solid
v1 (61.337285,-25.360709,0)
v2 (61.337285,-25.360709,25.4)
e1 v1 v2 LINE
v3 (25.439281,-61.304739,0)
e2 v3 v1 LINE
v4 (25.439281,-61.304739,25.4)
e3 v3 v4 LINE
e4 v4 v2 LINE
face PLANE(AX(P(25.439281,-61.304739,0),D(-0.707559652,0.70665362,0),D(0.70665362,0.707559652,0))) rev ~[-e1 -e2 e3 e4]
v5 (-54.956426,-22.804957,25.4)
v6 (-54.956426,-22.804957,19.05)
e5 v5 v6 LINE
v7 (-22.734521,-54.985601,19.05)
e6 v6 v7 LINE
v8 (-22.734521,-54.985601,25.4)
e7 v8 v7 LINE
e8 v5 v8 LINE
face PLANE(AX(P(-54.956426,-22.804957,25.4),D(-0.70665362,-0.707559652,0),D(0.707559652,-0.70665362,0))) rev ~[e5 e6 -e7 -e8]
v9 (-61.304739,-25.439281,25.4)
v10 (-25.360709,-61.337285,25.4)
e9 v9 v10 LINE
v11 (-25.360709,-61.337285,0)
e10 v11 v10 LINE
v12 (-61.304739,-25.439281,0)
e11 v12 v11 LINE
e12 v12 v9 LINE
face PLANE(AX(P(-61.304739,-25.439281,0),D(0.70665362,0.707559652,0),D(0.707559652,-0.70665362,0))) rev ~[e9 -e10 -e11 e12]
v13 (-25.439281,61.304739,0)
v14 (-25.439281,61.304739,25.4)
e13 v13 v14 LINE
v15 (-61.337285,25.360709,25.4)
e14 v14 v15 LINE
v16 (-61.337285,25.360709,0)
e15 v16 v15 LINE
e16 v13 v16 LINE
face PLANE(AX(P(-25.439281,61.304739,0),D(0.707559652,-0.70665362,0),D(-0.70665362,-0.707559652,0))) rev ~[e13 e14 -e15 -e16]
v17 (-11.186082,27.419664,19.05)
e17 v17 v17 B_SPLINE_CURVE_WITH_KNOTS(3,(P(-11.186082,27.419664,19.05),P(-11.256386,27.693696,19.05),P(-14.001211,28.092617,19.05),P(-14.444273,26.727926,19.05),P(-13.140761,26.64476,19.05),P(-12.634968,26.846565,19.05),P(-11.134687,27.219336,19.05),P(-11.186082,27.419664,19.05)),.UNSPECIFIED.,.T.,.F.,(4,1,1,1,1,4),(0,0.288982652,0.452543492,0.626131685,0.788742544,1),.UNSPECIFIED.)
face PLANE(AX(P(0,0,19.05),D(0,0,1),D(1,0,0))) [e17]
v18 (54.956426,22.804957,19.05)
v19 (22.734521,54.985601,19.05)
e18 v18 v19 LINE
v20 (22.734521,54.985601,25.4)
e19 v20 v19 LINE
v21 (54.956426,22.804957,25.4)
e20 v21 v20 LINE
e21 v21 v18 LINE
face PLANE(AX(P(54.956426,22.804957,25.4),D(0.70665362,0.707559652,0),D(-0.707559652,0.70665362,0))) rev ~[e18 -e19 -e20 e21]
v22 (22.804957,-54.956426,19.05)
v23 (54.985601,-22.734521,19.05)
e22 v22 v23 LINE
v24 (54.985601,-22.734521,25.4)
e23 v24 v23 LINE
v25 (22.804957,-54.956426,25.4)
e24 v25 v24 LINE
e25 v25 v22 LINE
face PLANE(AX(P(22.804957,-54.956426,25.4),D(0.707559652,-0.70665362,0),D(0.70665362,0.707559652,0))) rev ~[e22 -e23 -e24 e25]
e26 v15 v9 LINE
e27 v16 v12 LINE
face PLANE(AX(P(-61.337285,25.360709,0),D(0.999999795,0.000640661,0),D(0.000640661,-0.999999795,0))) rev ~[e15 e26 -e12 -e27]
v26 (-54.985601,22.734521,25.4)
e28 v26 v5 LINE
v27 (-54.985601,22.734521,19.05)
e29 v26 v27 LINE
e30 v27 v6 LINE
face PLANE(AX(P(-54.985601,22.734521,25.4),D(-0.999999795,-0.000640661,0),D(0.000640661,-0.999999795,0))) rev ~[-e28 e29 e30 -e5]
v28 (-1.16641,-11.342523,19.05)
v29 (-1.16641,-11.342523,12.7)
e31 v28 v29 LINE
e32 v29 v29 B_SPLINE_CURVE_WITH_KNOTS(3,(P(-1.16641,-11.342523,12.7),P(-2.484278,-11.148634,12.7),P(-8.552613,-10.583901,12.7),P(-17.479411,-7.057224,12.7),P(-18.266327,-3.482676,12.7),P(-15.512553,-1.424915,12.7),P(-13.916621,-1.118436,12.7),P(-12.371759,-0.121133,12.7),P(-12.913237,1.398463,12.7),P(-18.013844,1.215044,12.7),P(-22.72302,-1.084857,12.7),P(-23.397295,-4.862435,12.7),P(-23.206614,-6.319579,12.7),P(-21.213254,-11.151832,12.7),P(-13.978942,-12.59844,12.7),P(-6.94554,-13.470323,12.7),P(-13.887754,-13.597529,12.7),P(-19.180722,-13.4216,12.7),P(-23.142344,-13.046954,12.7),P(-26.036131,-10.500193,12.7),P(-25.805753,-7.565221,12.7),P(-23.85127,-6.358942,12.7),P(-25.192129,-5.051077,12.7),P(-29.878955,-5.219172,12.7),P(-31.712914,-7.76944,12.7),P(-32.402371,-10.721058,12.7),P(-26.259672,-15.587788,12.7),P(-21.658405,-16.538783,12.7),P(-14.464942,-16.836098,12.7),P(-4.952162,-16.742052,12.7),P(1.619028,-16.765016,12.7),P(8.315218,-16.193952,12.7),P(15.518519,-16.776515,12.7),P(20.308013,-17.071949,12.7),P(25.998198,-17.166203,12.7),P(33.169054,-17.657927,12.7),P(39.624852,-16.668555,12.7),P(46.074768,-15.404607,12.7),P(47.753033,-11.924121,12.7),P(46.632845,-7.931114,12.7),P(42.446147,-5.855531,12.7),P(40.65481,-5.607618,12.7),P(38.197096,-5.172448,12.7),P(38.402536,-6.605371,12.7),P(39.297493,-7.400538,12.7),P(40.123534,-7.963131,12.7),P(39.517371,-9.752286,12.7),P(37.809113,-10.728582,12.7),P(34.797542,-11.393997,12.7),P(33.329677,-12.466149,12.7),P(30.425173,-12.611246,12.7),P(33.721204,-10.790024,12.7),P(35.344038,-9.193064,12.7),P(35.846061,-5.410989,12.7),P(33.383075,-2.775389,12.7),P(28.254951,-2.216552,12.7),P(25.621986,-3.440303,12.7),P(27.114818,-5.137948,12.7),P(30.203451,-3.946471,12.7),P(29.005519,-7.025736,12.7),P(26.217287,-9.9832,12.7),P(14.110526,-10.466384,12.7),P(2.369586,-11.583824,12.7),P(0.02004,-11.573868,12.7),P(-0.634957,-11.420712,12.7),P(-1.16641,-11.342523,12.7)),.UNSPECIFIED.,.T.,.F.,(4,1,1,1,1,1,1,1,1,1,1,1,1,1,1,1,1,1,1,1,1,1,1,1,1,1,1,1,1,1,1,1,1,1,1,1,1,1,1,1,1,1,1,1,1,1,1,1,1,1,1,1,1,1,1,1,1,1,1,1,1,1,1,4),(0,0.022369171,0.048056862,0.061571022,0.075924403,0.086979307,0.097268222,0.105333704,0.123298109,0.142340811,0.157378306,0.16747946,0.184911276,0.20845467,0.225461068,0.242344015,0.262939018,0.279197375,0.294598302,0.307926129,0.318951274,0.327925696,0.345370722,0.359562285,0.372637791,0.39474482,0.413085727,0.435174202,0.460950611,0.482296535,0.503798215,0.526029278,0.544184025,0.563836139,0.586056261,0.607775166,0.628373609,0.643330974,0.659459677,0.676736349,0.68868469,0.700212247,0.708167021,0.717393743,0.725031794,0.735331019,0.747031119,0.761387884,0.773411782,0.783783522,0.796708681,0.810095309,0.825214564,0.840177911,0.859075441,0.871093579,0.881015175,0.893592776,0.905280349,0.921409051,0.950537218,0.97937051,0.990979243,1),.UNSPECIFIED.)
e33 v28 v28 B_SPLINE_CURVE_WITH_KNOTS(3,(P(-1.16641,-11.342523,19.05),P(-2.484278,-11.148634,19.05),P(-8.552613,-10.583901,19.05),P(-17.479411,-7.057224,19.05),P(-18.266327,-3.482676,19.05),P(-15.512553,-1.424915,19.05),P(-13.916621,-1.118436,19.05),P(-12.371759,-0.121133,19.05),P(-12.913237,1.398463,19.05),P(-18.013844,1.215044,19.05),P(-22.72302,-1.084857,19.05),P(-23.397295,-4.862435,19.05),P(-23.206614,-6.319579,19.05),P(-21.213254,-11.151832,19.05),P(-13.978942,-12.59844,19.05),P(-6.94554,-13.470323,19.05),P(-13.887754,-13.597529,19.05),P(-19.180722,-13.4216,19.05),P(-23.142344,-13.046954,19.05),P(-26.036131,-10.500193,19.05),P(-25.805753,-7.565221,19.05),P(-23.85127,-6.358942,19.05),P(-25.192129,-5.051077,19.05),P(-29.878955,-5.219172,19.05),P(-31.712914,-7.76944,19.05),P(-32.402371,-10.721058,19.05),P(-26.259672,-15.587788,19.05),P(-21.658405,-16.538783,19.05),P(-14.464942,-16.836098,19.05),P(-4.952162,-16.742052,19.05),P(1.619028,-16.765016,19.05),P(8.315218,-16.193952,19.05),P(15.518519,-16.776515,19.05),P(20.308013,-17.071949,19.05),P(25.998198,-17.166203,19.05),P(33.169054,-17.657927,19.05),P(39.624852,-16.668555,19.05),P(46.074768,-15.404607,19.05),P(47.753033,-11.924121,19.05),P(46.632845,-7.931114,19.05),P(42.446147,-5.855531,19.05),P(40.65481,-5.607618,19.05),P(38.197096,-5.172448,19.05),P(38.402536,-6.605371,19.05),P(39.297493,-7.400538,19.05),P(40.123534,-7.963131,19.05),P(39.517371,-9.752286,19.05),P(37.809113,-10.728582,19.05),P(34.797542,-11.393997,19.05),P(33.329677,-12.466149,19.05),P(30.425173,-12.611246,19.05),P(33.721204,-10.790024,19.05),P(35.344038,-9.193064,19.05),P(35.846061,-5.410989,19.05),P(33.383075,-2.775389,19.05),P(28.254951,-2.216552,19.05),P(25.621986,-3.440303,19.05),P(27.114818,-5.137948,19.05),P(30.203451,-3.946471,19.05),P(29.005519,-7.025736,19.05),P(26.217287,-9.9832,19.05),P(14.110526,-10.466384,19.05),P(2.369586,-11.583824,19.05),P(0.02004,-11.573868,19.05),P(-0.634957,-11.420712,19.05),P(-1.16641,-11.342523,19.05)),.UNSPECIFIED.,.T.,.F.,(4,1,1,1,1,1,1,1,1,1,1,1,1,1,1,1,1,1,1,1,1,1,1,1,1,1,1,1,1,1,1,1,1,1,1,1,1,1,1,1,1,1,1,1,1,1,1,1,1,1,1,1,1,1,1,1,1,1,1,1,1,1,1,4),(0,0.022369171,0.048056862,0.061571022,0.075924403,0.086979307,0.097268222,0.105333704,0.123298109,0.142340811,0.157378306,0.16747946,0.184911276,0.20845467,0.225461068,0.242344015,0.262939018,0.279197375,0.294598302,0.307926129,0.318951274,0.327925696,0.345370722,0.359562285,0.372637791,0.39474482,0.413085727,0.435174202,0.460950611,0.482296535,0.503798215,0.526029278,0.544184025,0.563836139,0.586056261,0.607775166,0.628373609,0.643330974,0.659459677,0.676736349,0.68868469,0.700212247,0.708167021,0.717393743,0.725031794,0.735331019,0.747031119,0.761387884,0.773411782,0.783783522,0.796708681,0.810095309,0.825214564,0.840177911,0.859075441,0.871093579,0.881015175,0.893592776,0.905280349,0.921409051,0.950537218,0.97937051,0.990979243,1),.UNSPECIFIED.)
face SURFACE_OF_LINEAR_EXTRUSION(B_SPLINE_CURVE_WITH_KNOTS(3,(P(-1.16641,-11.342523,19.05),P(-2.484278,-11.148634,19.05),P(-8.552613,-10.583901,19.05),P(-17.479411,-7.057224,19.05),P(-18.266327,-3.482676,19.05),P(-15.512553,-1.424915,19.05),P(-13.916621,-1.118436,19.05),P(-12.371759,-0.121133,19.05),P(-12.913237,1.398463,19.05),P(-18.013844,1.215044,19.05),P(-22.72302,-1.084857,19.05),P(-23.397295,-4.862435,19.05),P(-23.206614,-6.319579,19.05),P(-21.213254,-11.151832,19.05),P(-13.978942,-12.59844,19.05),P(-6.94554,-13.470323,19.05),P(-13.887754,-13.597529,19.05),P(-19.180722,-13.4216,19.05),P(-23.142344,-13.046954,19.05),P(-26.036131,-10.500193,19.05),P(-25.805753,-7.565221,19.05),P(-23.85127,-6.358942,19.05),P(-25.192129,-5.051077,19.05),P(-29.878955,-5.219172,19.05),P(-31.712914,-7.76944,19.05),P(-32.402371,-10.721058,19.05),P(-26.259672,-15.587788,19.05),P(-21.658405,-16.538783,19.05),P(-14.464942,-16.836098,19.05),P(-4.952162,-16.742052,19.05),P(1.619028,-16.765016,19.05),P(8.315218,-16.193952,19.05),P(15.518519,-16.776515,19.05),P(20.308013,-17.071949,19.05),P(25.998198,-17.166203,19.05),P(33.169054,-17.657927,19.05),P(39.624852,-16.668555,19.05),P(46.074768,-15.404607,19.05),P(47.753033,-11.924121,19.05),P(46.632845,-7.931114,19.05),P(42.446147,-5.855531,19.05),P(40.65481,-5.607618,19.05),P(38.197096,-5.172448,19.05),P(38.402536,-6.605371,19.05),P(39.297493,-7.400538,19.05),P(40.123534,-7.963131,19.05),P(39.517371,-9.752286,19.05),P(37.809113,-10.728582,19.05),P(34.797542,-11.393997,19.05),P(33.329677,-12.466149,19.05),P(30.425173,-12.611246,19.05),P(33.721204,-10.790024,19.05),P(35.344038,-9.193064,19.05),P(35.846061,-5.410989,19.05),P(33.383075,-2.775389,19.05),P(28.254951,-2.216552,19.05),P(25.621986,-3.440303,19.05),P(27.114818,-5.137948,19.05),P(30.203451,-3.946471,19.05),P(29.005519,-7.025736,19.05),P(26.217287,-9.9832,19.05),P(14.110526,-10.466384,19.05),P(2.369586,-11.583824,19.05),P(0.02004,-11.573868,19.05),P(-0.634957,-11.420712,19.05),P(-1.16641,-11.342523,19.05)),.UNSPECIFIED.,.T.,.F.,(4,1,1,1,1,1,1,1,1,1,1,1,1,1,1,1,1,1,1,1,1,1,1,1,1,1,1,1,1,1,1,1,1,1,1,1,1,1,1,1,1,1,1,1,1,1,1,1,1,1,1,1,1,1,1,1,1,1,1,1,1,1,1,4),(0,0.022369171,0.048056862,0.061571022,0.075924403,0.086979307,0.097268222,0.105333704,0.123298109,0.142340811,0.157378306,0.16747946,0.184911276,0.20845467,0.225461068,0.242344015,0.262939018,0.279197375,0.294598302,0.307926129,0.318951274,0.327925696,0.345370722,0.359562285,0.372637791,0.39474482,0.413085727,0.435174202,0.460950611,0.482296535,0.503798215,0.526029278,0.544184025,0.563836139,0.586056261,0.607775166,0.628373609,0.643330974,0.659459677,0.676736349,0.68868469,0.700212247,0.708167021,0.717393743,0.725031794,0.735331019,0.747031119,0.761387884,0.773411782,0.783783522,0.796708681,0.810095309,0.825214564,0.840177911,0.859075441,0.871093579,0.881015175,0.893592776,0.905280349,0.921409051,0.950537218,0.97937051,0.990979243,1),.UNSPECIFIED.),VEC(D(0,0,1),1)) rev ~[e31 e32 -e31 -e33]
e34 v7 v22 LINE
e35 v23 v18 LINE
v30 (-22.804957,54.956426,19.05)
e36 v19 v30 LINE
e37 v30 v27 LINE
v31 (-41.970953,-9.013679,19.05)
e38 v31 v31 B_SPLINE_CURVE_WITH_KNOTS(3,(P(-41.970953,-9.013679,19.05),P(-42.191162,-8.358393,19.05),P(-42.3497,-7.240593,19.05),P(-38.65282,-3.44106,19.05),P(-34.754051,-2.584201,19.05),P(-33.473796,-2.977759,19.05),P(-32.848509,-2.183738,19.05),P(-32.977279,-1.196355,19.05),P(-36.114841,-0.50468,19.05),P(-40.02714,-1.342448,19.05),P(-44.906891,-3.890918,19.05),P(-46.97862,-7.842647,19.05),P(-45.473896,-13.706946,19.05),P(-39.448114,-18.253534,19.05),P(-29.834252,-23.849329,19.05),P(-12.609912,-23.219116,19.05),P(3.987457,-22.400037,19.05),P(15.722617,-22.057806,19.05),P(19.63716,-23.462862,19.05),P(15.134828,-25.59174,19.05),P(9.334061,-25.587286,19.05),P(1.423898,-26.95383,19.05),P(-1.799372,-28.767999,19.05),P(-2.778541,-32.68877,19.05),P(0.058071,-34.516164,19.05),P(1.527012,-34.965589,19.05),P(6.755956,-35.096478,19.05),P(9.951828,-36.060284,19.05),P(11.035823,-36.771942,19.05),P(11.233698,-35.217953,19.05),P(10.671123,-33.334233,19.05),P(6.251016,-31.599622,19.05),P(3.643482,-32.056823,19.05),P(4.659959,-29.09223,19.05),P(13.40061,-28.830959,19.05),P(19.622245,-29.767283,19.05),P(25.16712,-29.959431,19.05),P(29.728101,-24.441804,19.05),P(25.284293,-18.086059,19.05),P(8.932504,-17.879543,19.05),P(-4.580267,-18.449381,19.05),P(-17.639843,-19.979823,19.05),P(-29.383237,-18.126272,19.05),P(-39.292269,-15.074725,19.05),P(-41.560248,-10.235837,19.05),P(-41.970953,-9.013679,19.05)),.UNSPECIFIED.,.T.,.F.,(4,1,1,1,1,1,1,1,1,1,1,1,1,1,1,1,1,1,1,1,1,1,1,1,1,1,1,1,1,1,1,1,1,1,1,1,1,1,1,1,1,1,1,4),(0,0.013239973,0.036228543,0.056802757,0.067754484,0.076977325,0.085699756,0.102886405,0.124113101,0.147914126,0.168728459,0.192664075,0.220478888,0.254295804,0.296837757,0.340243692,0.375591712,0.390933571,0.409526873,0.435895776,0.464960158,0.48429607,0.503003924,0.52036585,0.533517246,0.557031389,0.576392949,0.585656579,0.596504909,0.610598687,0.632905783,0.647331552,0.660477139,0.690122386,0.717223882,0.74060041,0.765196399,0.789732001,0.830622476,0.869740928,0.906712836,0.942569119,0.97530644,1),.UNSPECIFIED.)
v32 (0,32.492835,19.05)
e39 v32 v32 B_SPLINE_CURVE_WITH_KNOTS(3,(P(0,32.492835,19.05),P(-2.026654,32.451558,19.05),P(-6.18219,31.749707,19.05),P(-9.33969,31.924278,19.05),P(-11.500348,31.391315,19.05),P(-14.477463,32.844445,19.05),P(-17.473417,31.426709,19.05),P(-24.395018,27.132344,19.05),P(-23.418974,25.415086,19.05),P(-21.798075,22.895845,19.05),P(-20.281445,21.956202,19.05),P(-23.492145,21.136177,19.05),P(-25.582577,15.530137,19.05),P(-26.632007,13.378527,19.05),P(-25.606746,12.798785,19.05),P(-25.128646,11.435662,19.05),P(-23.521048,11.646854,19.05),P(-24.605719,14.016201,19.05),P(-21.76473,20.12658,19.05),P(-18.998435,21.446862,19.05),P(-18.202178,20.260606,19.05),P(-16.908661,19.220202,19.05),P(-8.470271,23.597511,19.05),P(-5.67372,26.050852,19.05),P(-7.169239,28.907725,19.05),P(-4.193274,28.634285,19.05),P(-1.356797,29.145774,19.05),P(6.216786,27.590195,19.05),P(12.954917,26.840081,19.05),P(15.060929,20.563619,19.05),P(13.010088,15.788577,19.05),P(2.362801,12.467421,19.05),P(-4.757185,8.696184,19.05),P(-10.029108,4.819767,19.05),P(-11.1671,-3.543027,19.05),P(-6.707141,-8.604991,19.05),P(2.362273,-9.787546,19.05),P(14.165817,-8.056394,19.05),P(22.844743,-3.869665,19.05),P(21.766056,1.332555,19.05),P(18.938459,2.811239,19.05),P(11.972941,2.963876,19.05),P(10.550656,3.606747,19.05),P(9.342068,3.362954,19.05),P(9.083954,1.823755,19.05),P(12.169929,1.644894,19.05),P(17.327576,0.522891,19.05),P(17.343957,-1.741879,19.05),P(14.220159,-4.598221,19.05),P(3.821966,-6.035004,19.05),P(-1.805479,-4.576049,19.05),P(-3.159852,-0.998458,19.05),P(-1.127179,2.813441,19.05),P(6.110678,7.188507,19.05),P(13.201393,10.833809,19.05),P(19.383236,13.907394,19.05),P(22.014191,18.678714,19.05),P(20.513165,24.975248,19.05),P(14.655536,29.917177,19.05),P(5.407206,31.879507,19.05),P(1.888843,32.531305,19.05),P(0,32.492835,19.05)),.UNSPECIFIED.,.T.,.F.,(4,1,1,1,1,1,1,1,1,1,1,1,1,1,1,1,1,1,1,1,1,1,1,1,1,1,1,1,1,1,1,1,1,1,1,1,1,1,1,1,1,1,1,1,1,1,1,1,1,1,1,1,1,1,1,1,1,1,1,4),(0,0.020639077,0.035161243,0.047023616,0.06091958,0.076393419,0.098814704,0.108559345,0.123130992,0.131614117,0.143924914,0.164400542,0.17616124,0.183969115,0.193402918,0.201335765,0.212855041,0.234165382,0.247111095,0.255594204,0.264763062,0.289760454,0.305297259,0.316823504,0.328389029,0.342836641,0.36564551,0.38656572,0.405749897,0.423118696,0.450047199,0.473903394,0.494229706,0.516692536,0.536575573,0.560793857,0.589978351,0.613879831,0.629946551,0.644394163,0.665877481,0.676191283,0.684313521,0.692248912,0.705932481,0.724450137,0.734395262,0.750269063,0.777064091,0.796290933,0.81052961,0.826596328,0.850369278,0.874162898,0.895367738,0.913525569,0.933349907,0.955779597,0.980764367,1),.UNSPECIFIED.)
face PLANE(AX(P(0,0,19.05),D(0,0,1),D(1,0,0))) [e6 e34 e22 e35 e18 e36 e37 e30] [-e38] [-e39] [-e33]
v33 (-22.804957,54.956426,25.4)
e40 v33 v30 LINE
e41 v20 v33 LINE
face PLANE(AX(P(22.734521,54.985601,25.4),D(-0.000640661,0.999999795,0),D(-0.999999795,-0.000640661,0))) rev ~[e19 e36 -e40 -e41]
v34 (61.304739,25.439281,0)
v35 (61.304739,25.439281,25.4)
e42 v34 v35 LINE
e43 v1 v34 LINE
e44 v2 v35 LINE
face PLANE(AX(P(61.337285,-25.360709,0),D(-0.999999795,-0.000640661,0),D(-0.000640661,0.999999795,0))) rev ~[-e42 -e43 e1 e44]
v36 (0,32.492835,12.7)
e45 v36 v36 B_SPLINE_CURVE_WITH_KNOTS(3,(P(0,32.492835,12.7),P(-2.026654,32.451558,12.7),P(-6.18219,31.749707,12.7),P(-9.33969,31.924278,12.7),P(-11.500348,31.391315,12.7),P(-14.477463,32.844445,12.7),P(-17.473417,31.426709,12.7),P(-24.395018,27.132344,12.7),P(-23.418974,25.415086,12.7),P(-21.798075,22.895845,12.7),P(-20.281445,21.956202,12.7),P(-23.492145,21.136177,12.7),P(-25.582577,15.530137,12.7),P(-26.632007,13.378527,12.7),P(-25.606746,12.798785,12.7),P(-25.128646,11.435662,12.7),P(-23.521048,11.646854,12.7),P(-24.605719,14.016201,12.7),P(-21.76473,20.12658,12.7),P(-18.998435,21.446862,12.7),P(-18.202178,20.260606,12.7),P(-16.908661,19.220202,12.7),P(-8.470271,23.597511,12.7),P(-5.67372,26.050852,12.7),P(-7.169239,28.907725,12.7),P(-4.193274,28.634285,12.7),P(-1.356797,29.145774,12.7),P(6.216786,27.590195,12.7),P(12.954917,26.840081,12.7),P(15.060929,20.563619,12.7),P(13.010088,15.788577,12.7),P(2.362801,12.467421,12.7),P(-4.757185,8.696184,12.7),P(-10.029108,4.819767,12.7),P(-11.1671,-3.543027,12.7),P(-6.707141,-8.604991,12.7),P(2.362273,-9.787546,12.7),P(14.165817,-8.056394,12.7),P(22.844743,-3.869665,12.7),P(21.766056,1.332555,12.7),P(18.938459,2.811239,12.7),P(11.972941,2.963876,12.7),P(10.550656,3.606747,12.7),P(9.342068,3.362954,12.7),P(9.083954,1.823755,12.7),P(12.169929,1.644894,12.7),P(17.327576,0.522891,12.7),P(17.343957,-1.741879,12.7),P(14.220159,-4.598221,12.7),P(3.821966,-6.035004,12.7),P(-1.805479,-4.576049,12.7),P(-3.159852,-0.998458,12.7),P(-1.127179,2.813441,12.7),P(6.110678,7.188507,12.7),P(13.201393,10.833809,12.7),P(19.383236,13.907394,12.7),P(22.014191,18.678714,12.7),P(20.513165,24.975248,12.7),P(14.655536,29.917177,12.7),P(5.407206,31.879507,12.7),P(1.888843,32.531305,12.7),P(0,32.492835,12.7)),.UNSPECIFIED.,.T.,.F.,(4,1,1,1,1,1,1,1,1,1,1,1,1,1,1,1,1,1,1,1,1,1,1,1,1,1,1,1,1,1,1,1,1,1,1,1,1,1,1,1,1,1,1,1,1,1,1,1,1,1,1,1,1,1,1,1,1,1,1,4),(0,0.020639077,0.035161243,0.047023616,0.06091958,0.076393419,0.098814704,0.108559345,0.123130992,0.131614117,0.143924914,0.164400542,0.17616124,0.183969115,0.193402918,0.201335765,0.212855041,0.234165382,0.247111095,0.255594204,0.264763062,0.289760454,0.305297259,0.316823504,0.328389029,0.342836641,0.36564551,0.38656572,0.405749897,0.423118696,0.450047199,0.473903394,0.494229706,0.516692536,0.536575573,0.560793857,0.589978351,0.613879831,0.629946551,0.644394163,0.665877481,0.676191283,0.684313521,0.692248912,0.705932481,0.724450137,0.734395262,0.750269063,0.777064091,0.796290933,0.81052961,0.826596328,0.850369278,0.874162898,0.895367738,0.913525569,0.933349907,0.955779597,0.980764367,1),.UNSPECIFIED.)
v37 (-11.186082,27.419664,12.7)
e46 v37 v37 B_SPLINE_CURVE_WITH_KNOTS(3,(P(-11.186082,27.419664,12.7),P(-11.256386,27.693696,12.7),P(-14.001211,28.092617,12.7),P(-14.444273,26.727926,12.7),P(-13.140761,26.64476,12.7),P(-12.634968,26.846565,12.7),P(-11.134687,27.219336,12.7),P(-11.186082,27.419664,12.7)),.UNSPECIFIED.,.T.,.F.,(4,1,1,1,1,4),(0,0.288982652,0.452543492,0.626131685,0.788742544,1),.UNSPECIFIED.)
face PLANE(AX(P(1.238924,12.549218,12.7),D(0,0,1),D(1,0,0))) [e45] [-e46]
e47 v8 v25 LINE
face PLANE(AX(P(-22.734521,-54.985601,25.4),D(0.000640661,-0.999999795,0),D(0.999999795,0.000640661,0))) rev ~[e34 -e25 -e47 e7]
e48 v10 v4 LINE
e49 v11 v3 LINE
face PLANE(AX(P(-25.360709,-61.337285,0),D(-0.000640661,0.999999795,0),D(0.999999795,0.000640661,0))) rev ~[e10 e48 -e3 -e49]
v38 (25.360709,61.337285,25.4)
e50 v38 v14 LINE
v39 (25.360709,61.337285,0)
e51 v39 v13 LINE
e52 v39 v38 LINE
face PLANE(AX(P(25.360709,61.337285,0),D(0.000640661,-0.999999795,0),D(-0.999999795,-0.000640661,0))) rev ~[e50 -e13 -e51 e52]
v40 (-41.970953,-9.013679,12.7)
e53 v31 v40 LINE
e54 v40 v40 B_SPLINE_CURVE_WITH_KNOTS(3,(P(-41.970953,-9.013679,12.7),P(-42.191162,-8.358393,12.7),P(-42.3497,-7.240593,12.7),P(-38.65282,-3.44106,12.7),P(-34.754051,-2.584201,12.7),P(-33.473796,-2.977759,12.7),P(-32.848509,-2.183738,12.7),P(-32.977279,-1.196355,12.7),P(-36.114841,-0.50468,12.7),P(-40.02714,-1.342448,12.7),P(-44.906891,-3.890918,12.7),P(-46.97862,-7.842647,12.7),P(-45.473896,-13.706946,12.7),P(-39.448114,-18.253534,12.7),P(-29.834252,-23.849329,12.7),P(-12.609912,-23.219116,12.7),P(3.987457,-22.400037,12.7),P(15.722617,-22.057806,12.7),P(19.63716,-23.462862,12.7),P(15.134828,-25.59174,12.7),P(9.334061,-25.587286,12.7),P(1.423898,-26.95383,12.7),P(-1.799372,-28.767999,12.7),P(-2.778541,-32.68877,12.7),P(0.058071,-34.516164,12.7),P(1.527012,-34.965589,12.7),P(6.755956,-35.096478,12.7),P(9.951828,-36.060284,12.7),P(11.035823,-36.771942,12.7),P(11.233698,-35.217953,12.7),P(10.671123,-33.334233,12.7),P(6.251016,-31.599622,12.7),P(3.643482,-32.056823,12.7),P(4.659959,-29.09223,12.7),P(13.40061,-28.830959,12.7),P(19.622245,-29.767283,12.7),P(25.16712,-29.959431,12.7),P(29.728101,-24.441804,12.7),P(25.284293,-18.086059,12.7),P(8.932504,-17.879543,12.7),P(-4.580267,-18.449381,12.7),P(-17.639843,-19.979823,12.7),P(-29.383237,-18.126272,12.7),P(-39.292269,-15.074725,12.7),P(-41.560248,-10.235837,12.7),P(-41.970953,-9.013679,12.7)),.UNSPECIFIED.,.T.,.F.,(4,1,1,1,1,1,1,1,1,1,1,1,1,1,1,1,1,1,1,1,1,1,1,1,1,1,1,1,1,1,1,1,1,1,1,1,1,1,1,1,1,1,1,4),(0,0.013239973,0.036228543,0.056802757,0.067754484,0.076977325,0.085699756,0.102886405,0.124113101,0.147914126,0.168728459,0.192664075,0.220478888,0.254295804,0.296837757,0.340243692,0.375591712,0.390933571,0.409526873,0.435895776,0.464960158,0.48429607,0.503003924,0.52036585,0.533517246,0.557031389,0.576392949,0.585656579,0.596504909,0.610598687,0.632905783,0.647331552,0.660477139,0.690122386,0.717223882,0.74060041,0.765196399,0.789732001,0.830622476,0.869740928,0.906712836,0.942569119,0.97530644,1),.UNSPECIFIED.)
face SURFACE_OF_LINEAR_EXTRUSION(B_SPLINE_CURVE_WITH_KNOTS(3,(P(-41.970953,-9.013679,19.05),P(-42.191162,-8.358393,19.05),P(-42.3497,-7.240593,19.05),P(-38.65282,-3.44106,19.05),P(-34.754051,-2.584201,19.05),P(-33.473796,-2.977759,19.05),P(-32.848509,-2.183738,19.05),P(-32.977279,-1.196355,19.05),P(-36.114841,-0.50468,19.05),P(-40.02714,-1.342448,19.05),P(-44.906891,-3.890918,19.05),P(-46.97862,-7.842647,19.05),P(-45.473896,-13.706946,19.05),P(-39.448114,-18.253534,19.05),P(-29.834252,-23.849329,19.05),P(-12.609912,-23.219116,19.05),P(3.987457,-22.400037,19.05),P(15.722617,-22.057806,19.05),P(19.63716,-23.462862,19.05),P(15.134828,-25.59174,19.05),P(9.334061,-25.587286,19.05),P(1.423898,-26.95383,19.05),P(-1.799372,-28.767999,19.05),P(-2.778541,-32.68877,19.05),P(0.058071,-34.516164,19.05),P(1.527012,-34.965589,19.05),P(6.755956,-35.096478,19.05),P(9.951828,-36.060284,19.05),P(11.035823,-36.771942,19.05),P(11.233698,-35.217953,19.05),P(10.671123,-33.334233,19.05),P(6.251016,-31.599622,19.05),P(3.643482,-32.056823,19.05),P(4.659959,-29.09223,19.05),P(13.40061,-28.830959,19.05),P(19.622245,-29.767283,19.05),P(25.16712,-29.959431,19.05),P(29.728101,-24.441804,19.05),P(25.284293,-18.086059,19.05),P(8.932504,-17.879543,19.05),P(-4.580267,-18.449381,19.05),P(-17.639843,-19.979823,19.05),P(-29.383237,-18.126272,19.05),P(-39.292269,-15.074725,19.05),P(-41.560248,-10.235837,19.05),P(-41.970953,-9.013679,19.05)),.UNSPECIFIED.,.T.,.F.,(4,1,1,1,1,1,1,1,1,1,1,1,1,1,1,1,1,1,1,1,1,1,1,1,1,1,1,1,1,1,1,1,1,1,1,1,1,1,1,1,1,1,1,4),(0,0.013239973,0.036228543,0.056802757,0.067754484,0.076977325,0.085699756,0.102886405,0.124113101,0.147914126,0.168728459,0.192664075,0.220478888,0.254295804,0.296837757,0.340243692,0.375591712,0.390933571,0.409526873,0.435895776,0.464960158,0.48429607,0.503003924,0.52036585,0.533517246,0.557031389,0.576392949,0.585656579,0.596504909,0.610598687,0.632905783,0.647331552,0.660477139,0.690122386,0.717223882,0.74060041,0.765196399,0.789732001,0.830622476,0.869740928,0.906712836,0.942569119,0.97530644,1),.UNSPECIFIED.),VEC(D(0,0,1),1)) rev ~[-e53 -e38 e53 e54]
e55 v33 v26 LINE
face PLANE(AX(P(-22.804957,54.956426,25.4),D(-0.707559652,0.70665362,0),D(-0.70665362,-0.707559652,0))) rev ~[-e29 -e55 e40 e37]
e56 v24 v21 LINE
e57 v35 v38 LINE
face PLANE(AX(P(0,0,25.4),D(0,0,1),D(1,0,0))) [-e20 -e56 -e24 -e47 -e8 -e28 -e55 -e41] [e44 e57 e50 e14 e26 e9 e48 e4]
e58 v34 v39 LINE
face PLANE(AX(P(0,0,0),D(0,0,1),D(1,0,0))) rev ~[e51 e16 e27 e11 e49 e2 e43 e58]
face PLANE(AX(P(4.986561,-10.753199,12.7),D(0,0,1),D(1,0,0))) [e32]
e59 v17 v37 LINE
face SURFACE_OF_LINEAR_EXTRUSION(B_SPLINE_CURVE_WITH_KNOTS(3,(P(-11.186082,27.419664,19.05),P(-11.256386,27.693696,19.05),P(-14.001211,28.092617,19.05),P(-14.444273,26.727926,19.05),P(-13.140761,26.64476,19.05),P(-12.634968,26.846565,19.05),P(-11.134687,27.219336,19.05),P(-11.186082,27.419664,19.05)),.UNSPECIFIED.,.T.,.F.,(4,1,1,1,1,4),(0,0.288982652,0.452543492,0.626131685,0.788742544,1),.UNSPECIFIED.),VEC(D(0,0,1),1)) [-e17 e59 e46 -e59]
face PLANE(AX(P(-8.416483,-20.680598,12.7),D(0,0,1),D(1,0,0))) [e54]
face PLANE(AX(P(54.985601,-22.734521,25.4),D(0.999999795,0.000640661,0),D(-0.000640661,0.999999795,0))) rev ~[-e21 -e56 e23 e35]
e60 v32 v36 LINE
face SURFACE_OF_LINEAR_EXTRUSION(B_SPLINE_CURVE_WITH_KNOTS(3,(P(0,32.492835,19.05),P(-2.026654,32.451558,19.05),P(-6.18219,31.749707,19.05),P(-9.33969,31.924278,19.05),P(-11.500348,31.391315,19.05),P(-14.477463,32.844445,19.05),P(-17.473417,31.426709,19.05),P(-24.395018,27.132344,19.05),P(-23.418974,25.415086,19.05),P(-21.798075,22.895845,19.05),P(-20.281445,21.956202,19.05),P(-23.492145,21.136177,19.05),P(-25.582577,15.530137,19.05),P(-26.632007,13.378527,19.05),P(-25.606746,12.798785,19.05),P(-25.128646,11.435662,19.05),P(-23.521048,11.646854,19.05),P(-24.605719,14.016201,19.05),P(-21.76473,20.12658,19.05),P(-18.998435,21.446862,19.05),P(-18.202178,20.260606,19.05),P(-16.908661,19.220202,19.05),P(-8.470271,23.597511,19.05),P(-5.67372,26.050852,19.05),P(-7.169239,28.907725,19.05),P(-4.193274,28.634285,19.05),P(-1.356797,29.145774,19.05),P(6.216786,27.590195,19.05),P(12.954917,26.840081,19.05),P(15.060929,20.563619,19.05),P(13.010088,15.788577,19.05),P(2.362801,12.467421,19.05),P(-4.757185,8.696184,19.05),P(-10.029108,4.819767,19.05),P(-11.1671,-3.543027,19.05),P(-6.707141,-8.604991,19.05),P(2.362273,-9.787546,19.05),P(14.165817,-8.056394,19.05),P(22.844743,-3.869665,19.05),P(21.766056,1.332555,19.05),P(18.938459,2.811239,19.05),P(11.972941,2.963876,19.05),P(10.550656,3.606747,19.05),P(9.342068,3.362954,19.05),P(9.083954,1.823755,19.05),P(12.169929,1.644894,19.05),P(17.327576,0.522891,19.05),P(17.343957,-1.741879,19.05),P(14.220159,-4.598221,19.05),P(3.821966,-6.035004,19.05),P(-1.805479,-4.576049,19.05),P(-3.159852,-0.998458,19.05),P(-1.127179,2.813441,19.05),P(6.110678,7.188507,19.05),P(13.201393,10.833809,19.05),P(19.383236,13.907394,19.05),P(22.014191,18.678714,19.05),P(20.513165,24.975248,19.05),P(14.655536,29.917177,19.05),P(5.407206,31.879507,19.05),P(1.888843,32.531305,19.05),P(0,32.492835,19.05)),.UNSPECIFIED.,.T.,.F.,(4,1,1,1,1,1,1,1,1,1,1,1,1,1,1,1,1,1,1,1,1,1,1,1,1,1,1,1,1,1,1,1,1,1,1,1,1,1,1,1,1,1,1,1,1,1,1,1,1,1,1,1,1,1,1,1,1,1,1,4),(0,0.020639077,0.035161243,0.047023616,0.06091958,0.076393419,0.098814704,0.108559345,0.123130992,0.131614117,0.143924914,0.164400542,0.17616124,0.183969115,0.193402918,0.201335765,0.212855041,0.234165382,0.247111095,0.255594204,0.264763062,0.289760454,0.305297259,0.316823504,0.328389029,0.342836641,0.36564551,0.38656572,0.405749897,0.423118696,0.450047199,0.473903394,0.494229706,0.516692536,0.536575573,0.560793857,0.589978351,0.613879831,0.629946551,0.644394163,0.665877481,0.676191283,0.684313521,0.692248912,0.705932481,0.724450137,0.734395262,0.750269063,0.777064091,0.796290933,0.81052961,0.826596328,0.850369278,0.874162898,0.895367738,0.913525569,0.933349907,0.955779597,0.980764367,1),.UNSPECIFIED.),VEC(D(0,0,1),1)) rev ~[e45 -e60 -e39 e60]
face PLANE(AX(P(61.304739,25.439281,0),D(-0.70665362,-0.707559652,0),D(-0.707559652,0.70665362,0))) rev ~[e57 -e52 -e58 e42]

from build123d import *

# Parameters (mm, degrees)
F1_DEPTH = 25.4
F3_DEPTH = 6.35
F5_DEPTH = 6.35


with BuildPart() as f1:
    # F0 (on Top) → F1 (new body)
    with BuildSketch(Plane.XY):
        Polygon((-61.3372846899, 25.3607087968), (-61.3047391097, -25.4392807779), (-25.3607087968, -61.3372846899), (25.4392807779, -61.3047391097), (61.3372846899, -25.3607087968), (61.3047391097, 25.4392807779), (25.3607087968, 61.3372846899), (-25.4392807779, 61.3047391097), align=None)
    extrude(amount=F1_DEPTH)

    # F2 (on face) → F3 (cut)
    with BuildSketch(Plane.XY.offset(25.4)):
        Polygon((-54.9856008905, 22.734521413), (-54.9564255154, -22.8049569991), (-22.734521413, -54.9856008905), (22.8049569991, -54.9564255154), (54.9856008905, -22.734521413), (54.9564255154, 22.8049569991), (22.734521413, 54.9856008905), (-22.8049569991, 54.9564255154), align=None)
    extrude(amount=-F3_DEPTH, mode=Mode.SUBTRACT)

    # F4 (on face) → F5 (cut)
    with BuildSketch(Plane.XY.offset(19.05)):
        with BuildLine():
            add(Edge.make_bspline(
                [(0, 32.4928350747), (-2.02665443, 32.4515584663), (-6.1821896181, 31.7497065716), (-9.3396897547, 31.9242783794), (-11.5003480916, 31.3913149272), (-14.4774634916, 32.8444451189), (-17.4734169272, 31.4267092211), (-24.3950179391, 27.1323443805), (-23.4189738768, 25.4150859361), (-21.7980747865, 22.8958449868), (-20.2814454001, 21.9562019156), (-23.4921452503, 21.1361770855), (-25.5825772036, 15.5301374946), (-26.6320070635, 13.378526896), (-25.6067459699, 12.798784515), (-25.1286460968, 11.4356624756), (-23.5210478416, 11.6468537322), (-24.6057192979, 14.0162008911), (-21.7647301762, 20.1265801161), (-18.9984353167, 21.4468623697), (-18.2021783197, 20.2606055269), (-16.9086613099, 19.2202016185), (-8.4702710322, 23.5975113963), (-5.6737203544, 26.0508520587), (-7.1692394224, 28.9077254429), (-4.1932743401, 28.6342846216), (-1.3567965699, 29.1457740371), (6.2167864003, 27.5901948262), (12.9549170867, 26.8400806968), (15.0609285948, 20.5636192608), (13.0100880074, 15.7885773924), (2.3628006843, 12.4674207824), (-4.7571848216, 8.6961838701), (-10.0291084028, 4.8197671989), (-11.1670998303, -3.5430268416), (-6.7071414645, -8.6049913594), (2.3622730255, -9.7875455052), (14.1658166841, -8.0563944992), (22.8447425092, -3.8696651926), (21.7660557386, 1.3325554585), (18.9384588869, 2.8112387978), (11.9729408281, 2.9638757064), (10.5506555229, 3.6067465992), (9.3420681736, 3.362953775), (9.0839535739, 1.8237552438), (12.1699293236, 1.6448938693), (17.3275762328, 0.5228914679), (17.343957002, -1.7418792899), (14.2201592243, -4.5982214393), (3.8219661075, -6.0350042747), (-1.8054793689, -4.5760486927), (-3.159852163, -0.998458362), (-1.1271792202, 2.8134408354), (6.1106781025, 7.1885070336), (13.2013933579, 10.8338087429), (19.383236378, 13.9073936379), (22.0141910817, 18.6787142044), (20.5131648158, 24.9752478489), (14.6555355139, 29.917176979), (5.4072057042, 31.8795066229), (1.8888431912, 32.5313048994), (0, 32.4928350747)],
                knots=[0, 0, 0, 0, 0.0206390772, 0.0351612434, 0.0470236164, 0.0609195804, 0.0763934194, 0.0988147036, 0.1085593451, 0.1231309925, 0.131614117, 0.1439249136, 0.1644005417, 0.1761612399, 0.1839691152, 0.1934029176, 0.2013357647, 0.2128550407, 0.2341653825, 0.2471110948, 0.2555942041, 0.2647630615, 0.2897604539, 0.3052972595, 0.3168235043, 0.3283890295, 0.3428366407, 0.36564551, 0.3865657196, 0.4057498968, 0.4231186957, 0.4500471985, 0.4739033938, 0.4942297055, 0.5166925362, 0.5365755735, 0.5607938567, 0.5899783508, 0.6138798307, 0.6299465505, 0.644394163, 0.6658774806, 0.6761912827, 0.684313521, 0.6922489115, 0.7059324809, 0.7244501375, 0.7343952618, 0.750269063, 0.7770640906, 0.7962909332, 0.8105296101, 0.8265963281, 0.8503692785, 0.8741628976, 0.8953677377, 0.9135255692, 0.9333499073, 0.9557795967, 0.9807643672, 1, 1, 1, 1], degree=3))
        make_face()
        with BuildLine():
            add(Edge.make_bspline(
                [(-11.1860819161, 27.4196639657), (-11.2563861036, 27.6936958998), (-14.0012109775, 28.0926169968), (-14.4442728998, 26.7279262694), (-13.140761497, 26.6447598295), (-12.6349676031, 26.846565007), (-11.1346868455, 27.2193360607), (-11.1860819161, 27.4196639657)],
                knots=[0, 0, 0, 0, 0.2889826517, 0.4525434925, 0.6261316853, 0.7887425441, 1, 1, 1, 1], degree=3))
        make_face(mode=Mode.SUBTRACT)
        with BuildLine():
            add(Edge.make_bspline(
                [(-1.1664102785, -11.3425226882), (-2.4842779162, -11.1486337497), (-8.5526134999, -10.5839010924), (-17.4794108044, -7.0572240397), (-18.266327002, -3.4826760224), (-15.5125530603, -1.4249147337), (-13.9166212665, -1.1184361923), (-12.3717590035, -0.1211327365), (-12.9132368388, 1.3984629466), (-18.0138444325, 1.2150440539), (-22.723019617, -1.0848573406), (-23.3972945312, -4.862435008), (-23.2066140331, -6.319579442), (-21.213254088, -11.1518322288), (-13.9789421106, -12.5984399396), (-6.9455404486, -13.4703228485), (-13.8877543431, -13.5975285068), (-19.1807216844, -13.4215999201), (-23.1423440865, -13.0469543081), (-26.0361310429, -10.5001925504), (-25.805753022, -7.5652206626), (-23.8512704233, -6.3589419892), (-25.1921291192, -5.0510765266), (-29.8789552059, -5.219172169), (-31.7129141235, -7.769440464), (-32.4023710313, -10.7210577986), (-26.2596721529, -15.5877879415), (-21.6584048851, -16.5387829646), (-14.4649421135, -16.836098081), (-4.9521619341, -16.7420522294), (1.6190281119, -16.7650158379), (8.3152182991, -16.1939516039), (15.5185187492, -16.7765146578), (20.308012588, -17.0719490808), (25.998198314, -17.1662026151), (33.1690536304, -17.6579269433), (39.6248516906, -16.6685545513), (46.0747675359, -15.4046066885), (47.7530334862, -11.9241209977), (46.6328452738, -7.9311136006), (42.4461470585, -5.8555307024), (40.6548102856, -5.6076176981), (38.1970955586, -5.1724477526), (38.4025358872, -6.6053706812), (39.2974932883, -7.4005381024), (40.1235339059, -7.9631310224), (39.5173708689, -9.7522862567), (37.809112654, -10.7285822467), (34.7975424818, -11.3939970567), (33.3296774157, -12.4661493109), (30.4251730138, -12.6112461847), (33.721203786, -10.7900236231), (35.3440376001, -9.193064247), (35.8460607238, -5.4109887905), (33.3830752712, -2.7753889232), (28.2549505247, -2.216551509), (25.6219858577, -3.4403034809), (27.1148180657, -5.1379482274), (30.2034505279, -3.9464711824), (29.0055185388, -7.0257362536), (26.217286788, -9.9832002985), (14.1105261465, -10.4663841793), (2.3695856708, -11.5838239957), (0.0200399681, -11.5738681482), (-0.6349572405, -11.4207117737), (-1.1664102785, -11.3425226882)],
                knots=[0, 0, 0, 0, 0.0223691706, 0.0480568622, 0.0615710219, 0.0759244025, 0.0869793068, 0.0972682223, 0.1053337035, 0.1232981087, 0.1423408108, 0.1573783055, 0.1674794599, 0.1849112758, 0.20845467, 0.225461068, 0.2423440146, 0.2629390182, 0.2791973751, 0.2945983023, 0.307926129, 0.318951274, 0.3279256957, 0.3453707221, 0.3595622846, 0.3726377905, 0.3947448203, 0.4130857268, 0.4351742017, 0.4609506109, 0.4822965348, 0.5037982154, 0.526029278, 0.5441840249, 0.5638361393, 0.5860562606, 0.607775166, 0.6283736085, 0.6433309743, 0.6594596769, 0.6767363495, 0.6886846896, 0.7002122469, 0.7081670213, 0.7173937428, 0.7250317942, 0.7353310189, 0.7470311187, 0.7613878839, 0.773411782, 0.7837835217, 0.7967086809, 0.8100953088, 0.8252145642, 0.8401779107, 0.8590754412, 0.8710935792, 0.8810151755, 0.8935927763, 0.9052803493, 0.9214090515, 0.9505372178, 0.9793705096, 0.990979243, 1, 1, 1, 1], degree=3))
        make_face()
        with BuildLine():
            add(Edge.make_bspline(
                [(-41.9709534322, -9.0136790223), (-42.1911620114, -8.3583932618), (-42.34969998, -7.2405928655), (-38.6528197879, -3.4410600635), (-34.7540509361, -2.5842009589), (-33.473796151, -2.9777589907), (-32.8485086334, -2.1837376094), (-32.9772793951, -1.1963546931), (-36.114841486, -0.5046797806), (-40.0271404038, -1.3424478879), (-44.9068911973, -3.8909175217), (-46.9786196208, -7.8426469478), (-45.4738964104, -13.7069461942), (-39.4481143266, -18.2535337581), (-29.8342522455, -23.8493289435), (-12.6099116362, -23.2191159228), (3.9874574831, -22.4000367715), (15.7226173903, -22.0578064491), (19.6371595731, -23.462862165), (15.1348280873, -25.5917400241), (9.3340607209, -25.5872860996), (1.4238978196, -26.9538303197), (-1.799372016, -28.7679988153), (-2.7785407451, -32.688769696), (0.0580706355, -34.5161638938), (1.5270121873, -34.9655891739), (6.7559561268, -35.0964780058), (9.951827923, -36.0602842107), (11.0358232658, -36.7719422221), (11.2336976109, -35.2179528538), (10.6711227715, -33.3342328553), (6.2510157141, -31.599622017), (3.6434816701, -32.0568229039), (4.6599594673, -29.0922304053), (13.4006095047, -28.8309592901), (19.622244979, -29.7672833203), (25.1671195784, -29.9594311524), (29.7281007289, -24.4418042796), (25.2842929097, -18.0860589173), (8.9325042094, -17.8795427516), (-4.5802673011, -18.4493811924), (-17.6398430541, -19.9798226398), (-29.383236807, -18.1262721061), (-39.2922691717, -15.0747253717), (-41.5602476096, -10.2358370249), (-41.9709534322, -9.0136790223)],
                knots=[0, 0, 0, 0, 0.0132399726, 0.0362285429, 0.0568027573, 0.0677544837, 0.0769773246, 0.0856997561, 0.102886405, 0.1241131012, 0.1479141258, 0.1687284592, 0.1926640754, 0.2204788884, 0.2542958038, 0.2968377572, 0.3402436916, 0.3755917119, 0.3909335712, 0.4095268725, 0.4358957765, 0.4649601583, 0.48429607, 0.5030039239, 0.5203658503, 0.5335172464, 0.5570313887, 0.5763929492, 0.5856565788, 0.5965049086, 0.6105986869, 0.6329057833, 0.6473315524, 0.6604771391, 0.6901223856, 0.7172238816, 0.7406004101, 0.7651963995, 0.7897320009, 0.8306224765, 0.8697409284, 0.9067128362, 0.9425691187, 0.9753064396, 1, 1, 1, 1], degree=3))
        make_face()
    extrude(amount=-F5_DEPTH, mode=Mode.SUBTRACT)


solid = f1.part
